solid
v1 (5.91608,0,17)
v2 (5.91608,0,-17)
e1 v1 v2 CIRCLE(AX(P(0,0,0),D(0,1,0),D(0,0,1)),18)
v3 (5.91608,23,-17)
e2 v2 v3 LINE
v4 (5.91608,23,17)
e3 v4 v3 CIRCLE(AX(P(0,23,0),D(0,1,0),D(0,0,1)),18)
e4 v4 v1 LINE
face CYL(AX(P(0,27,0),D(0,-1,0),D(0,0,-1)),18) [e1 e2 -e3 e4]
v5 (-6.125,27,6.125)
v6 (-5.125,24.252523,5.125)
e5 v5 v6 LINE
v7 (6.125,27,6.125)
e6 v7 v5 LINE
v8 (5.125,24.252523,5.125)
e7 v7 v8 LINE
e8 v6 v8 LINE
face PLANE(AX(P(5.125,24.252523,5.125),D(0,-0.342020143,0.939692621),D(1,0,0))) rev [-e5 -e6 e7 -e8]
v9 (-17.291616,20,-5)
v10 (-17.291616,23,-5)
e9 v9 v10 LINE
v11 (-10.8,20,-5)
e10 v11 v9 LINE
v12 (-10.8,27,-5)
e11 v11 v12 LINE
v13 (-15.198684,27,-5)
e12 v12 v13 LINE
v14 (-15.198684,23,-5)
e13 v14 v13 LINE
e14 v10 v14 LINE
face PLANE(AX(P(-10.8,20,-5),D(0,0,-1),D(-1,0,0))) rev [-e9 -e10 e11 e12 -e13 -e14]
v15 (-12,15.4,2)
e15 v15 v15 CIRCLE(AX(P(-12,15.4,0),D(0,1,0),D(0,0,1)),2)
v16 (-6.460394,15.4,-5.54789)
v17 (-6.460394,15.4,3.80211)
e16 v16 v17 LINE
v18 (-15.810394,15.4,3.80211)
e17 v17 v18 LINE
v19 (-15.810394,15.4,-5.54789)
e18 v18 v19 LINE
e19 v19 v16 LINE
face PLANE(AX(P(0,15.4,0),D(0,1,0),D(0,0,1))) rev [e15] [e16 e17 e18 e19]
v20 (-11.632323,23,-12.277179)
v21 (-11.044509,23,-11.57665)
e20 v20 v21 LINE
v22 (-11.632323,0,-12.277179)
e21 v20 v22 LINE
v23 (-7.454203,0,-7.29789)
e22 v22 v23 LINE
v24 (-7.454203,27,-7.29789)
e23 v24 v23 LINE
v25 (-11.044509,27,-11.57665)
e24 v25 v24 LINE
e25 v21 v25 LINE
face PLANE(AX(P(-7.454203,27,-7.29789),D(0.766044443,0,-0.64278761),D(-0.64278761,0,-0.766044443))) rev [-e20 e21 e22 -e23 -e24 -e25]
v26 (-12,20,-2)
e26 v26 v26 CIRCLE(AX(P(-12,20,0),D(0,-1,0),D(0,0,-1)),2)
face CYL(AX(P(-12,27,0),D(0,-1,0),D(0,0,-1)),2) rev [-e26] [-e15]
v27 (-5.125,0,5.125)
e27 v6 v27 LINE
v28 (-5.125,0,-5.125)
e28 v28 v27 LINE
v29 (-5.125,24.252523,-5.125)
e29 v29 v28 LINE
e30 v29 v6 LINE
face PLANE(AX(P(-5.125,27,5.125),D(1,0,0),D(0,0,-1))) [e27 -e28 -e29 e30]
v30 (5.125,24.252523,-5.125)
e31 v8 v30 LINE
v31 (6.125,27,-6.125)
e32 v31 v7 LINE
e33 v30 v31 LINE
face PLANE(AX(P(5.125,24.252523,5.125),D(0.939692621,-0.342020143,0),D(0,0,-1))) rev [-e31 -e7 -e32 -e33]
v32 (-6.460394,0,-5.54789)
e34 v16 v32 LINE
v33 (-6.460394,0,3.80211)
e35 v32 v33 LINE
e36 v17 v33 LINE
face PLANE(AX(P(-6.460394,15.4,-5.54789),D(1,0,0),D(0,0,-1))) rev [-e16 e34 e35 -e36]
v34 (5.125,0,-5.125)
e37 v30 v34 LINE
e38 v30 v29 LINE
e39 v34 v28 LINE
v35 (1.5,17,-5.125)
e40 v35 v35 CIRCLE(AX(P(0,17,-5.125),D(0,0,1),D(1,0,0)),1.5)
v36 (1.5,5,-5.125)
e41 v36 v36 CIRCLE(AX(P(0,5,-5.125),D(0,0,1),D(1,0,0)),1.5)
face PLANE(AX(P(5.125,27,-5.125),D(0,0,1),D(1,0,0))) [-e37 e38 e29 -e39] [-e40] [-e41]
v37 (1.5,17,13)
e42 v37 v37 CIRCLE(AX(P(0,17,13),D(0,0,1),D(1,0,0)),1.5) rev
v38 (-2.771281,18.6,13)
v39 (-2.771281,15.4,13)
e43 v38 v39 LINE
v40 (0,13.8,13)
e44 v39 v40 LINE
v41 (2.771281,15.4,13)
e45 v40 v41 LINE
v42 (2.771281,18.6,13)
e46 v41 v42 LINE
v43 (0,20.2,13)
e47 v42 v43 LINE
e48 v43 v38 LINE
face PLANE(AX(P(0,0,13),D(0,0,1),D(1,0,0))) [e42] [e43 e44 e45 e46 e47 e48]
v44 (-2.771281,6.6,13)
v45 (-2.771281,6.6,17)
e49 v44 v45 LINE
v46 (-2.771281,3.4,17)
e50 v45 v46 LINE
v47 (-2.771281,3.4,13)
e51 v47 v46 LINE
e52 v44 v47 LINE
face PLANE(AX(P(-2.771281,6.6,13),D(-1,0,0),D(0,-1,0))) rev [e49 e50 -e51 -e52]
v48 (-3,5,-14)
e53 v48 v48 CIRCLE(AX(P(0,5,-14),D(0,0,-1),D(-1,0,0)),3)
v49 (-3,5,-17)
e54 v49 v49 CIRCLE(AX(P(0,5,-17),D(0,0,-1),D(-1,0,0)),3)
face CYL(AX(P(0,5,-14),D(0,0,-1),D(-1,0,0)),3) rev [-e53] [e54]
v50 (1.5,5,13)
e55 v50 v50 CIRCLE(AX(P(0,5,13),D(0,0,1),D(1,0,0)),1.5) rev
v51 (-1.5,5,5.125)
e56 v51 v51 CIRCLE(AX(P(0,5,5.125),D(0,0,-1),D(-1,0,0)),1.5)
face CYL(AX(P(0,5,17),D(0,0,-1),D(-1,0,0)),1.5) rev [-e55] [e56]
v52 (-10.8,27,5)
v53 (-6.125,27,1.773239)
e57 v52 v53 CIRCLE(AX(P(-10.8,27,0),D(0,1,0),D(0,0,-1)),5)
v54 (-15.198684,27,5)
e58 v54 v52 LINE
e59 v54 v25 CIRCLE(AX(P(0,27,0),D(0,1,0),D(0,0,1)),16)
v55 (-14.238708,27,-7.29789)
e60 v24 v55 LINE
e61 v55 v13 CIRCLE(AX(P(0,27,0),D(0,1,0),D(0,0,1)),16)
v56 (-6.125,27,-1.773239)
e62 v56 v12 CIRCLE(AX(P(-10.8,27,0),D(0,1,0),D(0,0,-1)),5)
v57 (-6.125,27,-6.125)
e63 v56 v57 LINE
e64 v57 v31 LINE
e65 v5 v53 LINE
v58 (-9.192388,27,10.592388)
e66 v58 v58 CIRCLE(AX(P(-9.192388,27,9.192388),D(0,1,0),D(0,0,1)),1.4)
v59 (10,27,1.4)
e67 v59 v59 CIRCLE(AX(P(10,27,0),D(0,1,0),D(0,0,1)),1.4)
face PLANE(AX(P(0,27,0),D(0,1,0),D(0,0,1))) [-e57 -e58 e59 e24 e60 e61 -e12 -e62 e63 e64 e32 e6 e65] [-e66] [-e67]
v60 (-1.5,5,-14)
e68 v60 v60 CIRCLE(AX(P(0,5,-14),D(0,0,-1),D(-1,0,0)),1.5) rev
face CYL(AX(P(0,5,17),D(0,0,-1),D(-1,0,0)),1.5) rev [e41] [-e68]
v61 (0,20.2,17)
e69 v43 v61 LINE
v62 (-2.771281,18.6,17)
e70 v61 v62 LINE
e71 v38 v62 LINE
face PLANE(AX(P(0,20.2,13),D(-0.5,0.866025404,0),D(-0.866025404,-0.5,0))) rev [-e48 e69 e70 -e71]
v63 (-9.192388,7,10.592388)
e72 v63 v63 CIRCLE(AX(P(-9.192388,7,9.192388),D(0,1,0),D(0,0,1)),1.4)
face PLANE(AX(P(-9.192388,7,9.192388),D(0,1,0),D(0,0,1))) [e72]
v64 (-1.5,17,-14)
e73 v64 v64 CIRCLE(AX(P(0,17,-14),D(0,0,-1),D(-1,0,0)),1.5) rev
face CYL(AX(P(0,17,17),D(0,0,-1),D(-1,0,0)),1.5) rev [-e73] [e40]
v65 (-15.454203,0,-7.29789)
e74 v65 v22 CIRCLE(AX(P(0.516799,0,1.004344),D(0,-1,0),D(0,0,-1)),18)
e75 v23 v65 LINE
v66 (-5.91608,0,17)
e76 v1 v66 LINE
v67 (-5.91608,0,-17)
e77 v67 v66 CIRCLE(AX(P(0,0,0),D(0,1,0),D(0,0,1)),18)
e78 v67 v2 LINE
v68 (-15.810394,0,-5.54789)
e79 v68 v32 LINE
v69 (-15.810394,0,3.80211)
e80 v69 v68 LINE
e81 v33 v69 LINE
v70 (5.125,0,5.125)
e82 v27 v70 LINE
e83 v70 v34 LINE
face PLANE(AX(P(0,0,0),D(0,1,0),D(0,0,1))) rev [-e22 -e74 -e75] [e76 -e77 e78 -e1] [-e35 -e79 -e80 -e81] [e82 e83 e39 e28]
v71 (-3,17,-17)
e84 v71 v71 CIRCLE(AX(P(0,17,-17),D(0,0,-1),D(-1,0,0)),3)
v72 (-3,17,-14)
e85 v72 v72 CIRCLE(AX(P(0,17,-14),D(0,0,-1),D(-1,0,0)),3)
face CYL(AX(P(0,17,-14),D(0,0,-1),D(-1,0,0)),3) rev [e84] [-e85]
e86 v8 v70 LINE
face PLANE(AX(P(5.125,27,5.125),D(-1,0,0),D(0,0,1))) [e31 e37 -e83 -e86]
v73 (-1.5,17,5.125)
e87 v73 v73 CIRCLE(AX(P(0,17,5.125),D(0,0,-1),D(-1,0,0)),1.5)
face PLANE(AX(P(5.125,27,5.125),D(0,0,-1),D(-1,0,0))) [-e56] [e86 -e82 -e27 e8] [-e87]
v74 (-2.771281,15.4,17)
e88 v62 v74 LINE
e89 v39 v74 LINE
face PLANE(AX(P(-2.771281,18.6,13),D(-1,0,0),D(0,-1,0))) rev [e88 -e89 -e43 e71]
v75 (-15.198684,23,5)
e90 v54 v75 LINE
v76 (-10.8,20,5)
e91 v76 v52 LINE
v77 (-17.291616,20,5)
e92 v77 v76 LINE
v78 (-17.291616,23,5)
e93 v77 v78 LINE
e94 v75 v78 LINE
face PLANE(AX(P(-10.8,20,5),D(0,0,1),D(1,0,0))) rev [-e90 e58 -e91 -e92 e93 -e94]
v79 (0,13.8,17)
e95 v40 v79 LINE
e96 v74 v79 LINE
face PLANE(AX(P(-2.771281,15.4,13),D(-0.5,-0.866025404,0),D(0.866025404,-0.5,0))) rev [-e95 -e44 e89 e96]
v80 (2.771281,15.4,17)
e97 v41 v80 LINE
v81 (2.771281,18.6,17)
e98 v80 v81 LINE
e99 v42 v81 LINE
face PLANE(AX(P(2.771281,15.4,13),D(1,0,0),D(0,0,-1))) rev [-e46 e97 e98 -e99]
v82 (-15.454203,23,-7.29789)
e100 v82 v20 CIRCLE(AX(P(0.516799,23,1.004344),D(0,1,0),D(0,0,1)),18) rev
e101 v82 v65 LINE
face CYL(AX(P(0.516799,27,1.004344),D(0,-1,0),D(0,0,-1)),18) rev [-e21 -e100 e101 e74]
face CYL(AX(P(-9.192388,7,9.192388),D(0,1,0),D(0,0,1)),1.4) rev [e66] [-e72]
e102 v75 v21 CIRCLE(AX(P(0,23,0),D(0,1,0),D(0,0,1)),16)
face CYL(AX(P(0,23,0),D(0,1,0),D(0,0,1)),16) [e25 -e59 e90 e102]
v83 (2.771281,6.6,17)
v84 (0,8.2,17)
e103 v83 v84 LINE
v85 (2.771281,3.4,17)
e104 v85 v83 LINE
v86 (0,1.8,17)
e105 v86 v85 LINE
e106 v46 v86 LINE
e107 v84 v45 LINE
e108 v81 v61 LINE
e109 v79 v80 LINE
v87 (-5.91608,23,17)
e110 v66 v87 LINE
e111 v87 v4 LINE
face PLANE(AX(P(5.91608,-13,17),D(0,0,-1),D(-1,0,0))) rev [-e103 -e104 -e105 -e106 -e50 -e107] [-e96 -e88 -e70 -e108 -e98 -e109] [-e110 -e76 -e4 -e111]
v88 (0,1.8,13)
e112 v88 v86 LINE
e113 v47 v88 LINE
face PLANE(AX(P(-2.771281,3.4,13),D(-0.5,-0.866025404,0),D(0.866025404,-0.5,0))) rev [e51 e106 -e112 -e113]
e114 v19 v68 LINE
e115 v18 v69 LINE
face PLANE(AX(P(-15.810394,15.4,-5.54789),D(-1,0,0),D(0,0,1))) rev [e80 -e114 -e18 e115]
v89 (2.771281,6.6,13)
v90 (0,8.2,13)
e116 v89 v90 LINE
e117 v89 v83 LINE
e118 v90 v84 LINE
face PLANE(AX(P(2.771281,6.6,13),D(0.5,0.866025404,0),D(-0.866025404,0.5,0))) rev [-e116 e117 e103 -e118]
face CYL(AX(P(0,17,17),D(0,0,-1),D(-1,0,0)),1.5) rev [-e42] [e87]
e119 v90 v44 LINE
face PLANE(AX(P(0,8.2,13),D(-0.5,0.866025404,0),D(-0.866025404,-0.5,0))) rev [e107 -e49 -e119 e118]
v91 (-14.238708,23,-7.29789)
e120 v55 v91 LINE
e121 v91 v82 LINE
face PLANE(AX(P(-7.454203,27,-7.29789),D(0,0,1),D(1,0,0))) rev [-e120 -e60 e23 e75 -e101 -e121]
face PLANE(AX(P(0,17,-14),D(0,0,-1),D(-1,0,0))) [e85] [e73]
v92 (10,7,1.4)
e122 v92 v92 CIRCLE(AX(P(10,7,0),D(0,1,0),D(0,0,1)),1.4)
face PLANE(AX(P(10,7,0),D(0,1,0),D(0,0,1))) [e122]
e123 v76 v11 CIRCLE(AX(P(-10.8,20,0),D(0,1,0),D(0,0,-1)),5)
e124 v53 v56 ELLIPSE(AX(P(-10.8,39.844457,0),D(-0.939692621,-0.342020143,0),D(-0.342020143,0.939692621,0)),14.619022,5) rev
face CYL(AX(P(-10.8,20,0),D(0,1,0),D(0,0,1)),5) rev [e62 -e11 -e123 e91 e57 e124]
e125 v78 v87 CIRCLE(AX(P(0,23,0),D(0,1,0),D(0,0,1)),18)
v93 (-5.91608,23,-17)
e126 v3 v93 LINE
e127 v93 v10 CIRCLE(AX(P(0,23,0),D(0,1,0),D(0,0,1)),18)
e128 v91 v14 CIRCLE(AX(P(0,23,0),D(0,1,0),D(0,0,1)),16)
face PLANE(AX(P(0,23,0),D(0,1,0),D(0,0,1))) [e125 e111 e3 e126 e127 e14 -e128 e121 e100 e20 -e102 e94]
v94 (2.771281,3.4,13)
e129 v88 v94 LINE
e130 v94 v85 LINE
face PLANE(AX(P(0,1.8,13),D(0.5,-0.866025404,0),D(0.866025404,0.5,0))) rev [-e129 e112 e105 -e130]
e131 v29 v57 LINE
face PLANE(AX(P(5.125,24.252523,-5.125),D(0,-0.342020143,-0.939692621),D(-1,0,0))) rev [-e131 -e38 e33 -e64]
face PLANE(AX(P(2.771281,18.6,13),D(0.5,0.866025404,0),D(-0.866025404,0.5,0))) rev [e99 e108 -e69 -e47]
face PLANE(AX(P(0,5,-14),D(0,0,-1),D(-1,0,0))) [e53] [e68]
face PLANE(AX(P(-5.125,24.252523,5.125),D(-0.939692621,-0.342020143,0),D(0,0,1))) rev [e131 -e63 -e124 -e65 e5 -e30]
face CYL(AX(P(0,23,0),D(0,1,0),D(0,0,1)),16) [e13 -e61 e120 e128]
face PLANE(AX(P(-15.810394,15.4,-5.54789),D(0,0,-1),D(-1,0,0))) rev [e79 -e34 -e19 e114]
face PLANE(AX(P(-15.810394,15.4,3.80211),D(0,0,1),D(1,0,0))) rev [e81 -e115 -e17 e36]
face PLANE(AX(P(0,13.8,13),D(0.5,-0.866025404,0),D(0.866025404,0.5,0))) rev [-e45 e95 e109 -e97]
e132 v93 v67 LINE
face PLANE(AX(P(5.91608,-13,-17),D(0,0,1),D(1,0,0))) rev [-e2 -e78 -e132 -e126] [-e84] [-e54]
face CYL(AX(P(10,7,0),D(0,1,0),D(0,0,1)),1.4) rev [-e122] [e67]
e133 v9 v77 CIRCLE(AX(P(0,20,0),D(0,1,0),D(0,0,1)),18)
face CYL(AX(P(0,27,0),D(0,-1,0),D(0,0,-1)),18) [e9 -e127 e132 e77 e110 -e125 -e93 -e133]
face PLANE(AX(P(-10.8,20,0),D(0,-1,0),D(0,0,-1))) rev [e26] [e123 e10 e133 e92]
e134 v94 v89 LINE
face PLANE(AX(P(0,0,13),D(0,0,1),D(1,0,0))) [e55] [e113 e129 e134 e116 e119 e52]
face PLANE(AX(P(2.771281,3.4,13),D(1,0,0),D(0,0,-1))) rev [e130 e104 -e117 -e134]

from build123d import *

# Parameters (mm, degrees)
SKETCH1_R           = 18
SKETCH1_R_2         = 2
SKETCH1_W           = 10.25
SKETCH1_H           = 10.25
BOSS_EXTRUDE1_DEPTH = 27
CUT_EXTRUDE1_START  = -7
CUT_EXTRUDE1_DEPTH  = 7
SKETCH4_W           = 9.35
SKETCH4_H           = 9.35
CUT_EXTRUDE3_DEPTH  = 15.4
CUT_EXTRUDE4_START  = -40
CUT_EXTRUDE4_DEPTH  = 40
SKETCH6_R           = 1.5
CUT_EXTRUDE5_DEPTH  = 48
SKETCH7_R           = 3
CUT_EXTRUDE6_DEPTH  = 3
CUT_EXTRUDE7_DEPTH  = 4
CHAMFER1_SIZE       = 1
CHAMFER1_SIZE_2     = 2.747477419
CUT_EXTRUDE8_DEPTH  = 37.633318168
SKETCH12_R          = 1.4
CUT_EXTRUDE10_DEPTH = 20
CUT_EXTRUDE9_START  = -4
SKETCH10_R          = 18
SKETCH10_R_2        = 16
CUT_EXTRUDE9_DEPTH  = 4


with BuildPart() as part:
    # Sketch1 → Boss-Extrude1 (new body)
    with BuildSketch(Plane(origin=(0, 0, 0), x_dir=(1, 0, 0), z_dir=(0, 1, 0))):
        with Locations(Location((0, 0, 0), (0, 0, 270))):
            Circle(SKETCH1_R)
        with Locations(Location((-12, 0, 0), (0, 0, 270))):
            Circle(SKETCH1_R_2, mode=Mode.SUBTRACT)
        Rectangle(SKETCH1_W, SKETCH1_H, mode=Mode.SUBTRACT)
    extrude(amount=BOSS_EXTRUDE1_DEPTH)

    # Sketch2 → Cut-Extrude1 (cut)
    with BuildSketch(Plane(origin=(0, 27, 0), x_dir=(1, 0, 0), z_dir=(0, 1, 0)).offset(CUT_EXTRUDE1_START)):
        with BuildLine():
            Line((-10.8, 5), (-17.291616466, 5))
            ThreePointArc((-17.291616466, 5), (-18, 0), (-17.291616466, -5))
            Line((-17.291616466, -5), (-10.8, -5))
            ThreePointArc((-10.8, -5), (-5.8, 0), (-10.8, 5))
        make_face()
    extrude(amount=CUT_EXTRUDE1_DEPTH, mode=Mode.SUBTRACT)

    # Sketch4 → Cut-Extrude3 (cut)
    with BuildSketch(Plane(origin=(0, 0, 0), x_dir=(-1, 0, 0), z_dir=(0, -1, 0))):
        with Locations((11.135393506, 0.872889968)):
            Rectangle(SKETCH4_W, SKETCH4_H)
    extrude(amount=-CUT_EXTRUDE3_DEPTH, mode=Mode.SUBTRACT)

    # Sketch5 → Cut-Extrude4 (cut)
    with BuildSketch(Plane(origin=(0, 27, 0), x_dir=(1, 0, 0), z_dir=(0, 1, 0)).offset(CUT_EXTRUDE4_START)):
        with BuildLine():
            Line((5.916079783, 17), (-5.916079783, 17))
            ThreePointArc((-5.916079783, 17), (0, 18), (5.916079783, 17))
        make_face()
        with BuildLine():
            Line((5.916079783, -17), (-5.916079783, -17))
            ThreePointArc((-5.916079783, -17), (0, -18), (5.916079783, -17))
        make_face()
    extrude(amount=CUT_EXTRUDE4_DEPTH, mode=Mode.SUBTRACT)

    # Sketch6 → Cut-Extrude5 (cut, through all)
    with BuildSketch(Plane(origin=(0, 0, -17), x_dir=(-1, 0, 0), z_dir=(0, 0, -1))):
        with Locations((0, 17)):
            Circle(SKETCH6_R)
        with Locations((0, 5)):
            Circle(SKETCH6_R)
    extrude(amount=-CUT_EXTRUDE5_DEPTH, mode=Mode.SUBTRACT)

    # Sketch7 → Cut-Extrude6 (cut)
    with BuildSketch(Plane(origin=(0, 0, -17), x_dir=(-1, 0, 0), z_dir=(0, 0, -1))):
        with Locations((0, 17)):
            Circle(SKETCH7_R)
        with Locations((0, 5)):
            Circle(SKETCH7_R)
    extrude(amount=-CUT_EXTRUDE6_DEPTH, mode=Mode.SUBTRACT)

    # Sketch8 → Cut-Extrude7 (cut)
    with BuildSketch(Plane.XY.offset(17)):
        Polygon((0, 13.8), (2.771281292, 15.4), (2.771281292, 18.6), (0, 20.2), (-2.771281292, 18.6), (-2.771281292, 15.4), align=None)
        Polygon((0, 1.8), (2.771281292, 3.4), (2.771281292, 6.6), (0, 8.2), (-2.771281292, 6.6), (-2.771281292, 3.4), align=None)
    extrude(amount=-CUT_EXTRUDE7_DEPTH, mode=Mode.SUBTRACT)

    # Chamfer1
    # the kernel refuses this chamfer: 2.747477419, 1 mm, written as the material it takes off along each edge
    with BuildSketch(Plane(origin=(-5.125, 27, -5.125), x_dir=(0, 0.09904090225204956, -0.9950833631817488), z_dir=(1, 0, 0)), Plane(origin=(-5.125, 27, 5.125), x_dir=(-0.9950833631817488, 0.09904090225204956, 0), z_dir=(0, 0, -1)), Plane(origin=(5.125, 27, 5.125), x_dir=(0, 0.09904090225204956, 0.9950833631817488), z_dir=(-1, 0, 0)), Plane(origin=(5.125, 27, -5.125), x_dir=(0.9950833631817488, 0.09904090225204956, 0), z_dir=(0, 0, 1))) as chamfer1_piece_1:
        Polygon((CHAMFER1_SIZE * 0.995083363182, -CHAMFER1_SIZE * 0.099040902252), (-CHAMFER1_SIZE_2 * 0.0990409022684, -CHAMFER1_SIZE_2 * 0.995083363346), (0, 0), align=None)
    extrude(amount=10.25, mode=Mode.SUBTRACT)
    with BuildSketch(Plane(origin=(-5.125, 27, 5.125), x_dir=(-0.9950833631817488, 0.09904090225204956, 0), z_dir=(0, 0, -1))) as chamfer1_piece_2a_section:
        Polygon((CHAMFER1_SIZE * 0.995083363182, -CHAMFER1_SIZE * 0.099040902252), (-CHAMFER1_SIZE_2 * 0.0990409022684, -CHAMFER1_SIZE_2 * 0.995083363346), (0, 0), align=None)
    chamfer1_piece_2a = extrude(amount=17.377491449, mode=Mode.PRIVATE)
    chamfer1_piece_2a = split(chamfer1_piece_2a, bisect_by=Plane(origin=(-5.432505006, 26.059901151, -5.125), z_dir=(0, 0, -1)), keep=Keep.TOP, mode=Mode.PRIVATE)
    with BuildSketch(Plane(origin=(-12.252491449, 27, -5.125), x_dir=(0, 0.09904090225204956, -0.9950833631817488), z_dir=(1, 0, 0))) as chamfer1_piece_2b_section:
        Polygon((CHAMFER1_SIZE * 0.995083363182, -CHAMFER1_SIZE * 0.099040902252), (-CHAMFER1_SIZE_2 * 0.0990409022684, -CHAMFER1_SIZE_2 * 0.995083363346), (0, 0), align=None)
    chamfer1_piece_2b = extrude(amount=17.377491449, mode=Mode.PRIVATE)
    chamfer1_piece_2b = split(chamfer1_piece_2b, bisect_by=Plane(origin=(-5.125, 26.059901151, -5.432505006), z_dir=(-1, 0, 0)), keep=Keep.TOP, mode=Mode.PRIVATE)
    chamfer1_piece_2 = chamfer1_piece_2a & chamfer1_piece_2b
    add(chamfer1_piece_2, mode=Mode.SUBTRACT)
    with BuildSketch(Plane(origin=(5.125, 27, -12.252491449), x_dir=(0.9950833631817488, 0.09904090225204956, 0), z_dir=(0, 0, 1))) as chamfer1_piece_3a_section:
        Polygon((CHAMFER1_SIZE * 0.995083363182, -CHAMFER1_SIZE * 0.099040902252), (-CHAMFER1_SIZE_2 * 0.0990409022684, -CHAMFER1_SIZE_2 * 0.995083363346), (0, 0), align=None)
    chamfer1_piece_3a = extrude(amount=17.377491449, mode=Mode.PRIVATE)
    chamfer1_piece_3a = split(chamfer1_piece_3a, bisect_by=Plane(origin=(5.432505006, 26.059901151, -5.125), z_dir=(0, 0, -1)), keep=Keep.TOP, mode=Mode.PRIVATE)
    with BuildSketch(Plane(origin=(-5.125, 27, -5.125), x_dir=(0, 0.09904090225204956, -0.9950833631817488), z_dir=(1, 0, 0))) as chamfer1_piece_3b_section:
        Polygon((CHAMFER1_SIZE * 0.995083363182, -CHAMFER1_SIZE * 0.099040902252), (-CHAMFER1_SIZE_2 * 0.0990409022684, -CHAMFER1_SIZE_2 * 0.995083363346), (0, 0), align=None)
    chamfer1_piece_3b = extrude(amount=17.377491449, mode=Mode.PRIVATE)
    chamfer1_piece_3b = split(chamfer1_piece_3b, bisect_by=Plane(origin=(5.125, 26.059901151, -5.432505006), z_dir=(1, 0, 0)), keep=Keep.TOP, mode=Mode.PRIVATE)
    chamfer1_piece_3 = chamfer1_piece_3a & chamfer1_piece_3b
    add(chamfer1_piece_3, mode=Mode.SUBTRACT)
    with BuildSketch(Plane(origin=(5.125, 27, 5.125), x_dir=(0, 0.09904090225204956, 0.9950833631817488), z_dir=(-1, 0, 0))) as chamfer1_piece_4a_section:
        Polygon((CHAMFER1_SIZE * 0.995083363182, -CHAMFER1_SIZE * 0.099040902252), (-CHAMFER1_SIZE_2 * 0.0990409022684, -CHAMFER1_SIZE_2 * 0.995083363346), (0, 0), align=None)
    chamfer1_piece_4a = extrude(amount=17.377491449, mode=Mode.PRIVATE)
    chamfer1_piece_4a = split(chamfer1_piece_4a, bisect_by=Plane(origin=(-5.125, 26.059901151, 5.432505006), z_dir=(-1, 0, 0)), keep=Keep.TOP, mode=Mode.PRIVATE)
    with BuildSketch(Plane(origin=(-5.125, 27, 12.252491449), x_dir=(-0.9950833631817488, 0.09904090225204956, 0), z_dir=(0, 0, -1))) as chamfer1_piece_4b_section:
        Polygon((CHAMFER1_SIZE * 0.995083363182, -CHAMFER1_SIZE * 0.099040902252), (-CHAMFER1_SIZE_2 * 0.0990409022684, -CHAMFER1_SIZE_2 * 0.995083363346), (0, 0), align=None)
    chamfer1_piece_4b = extrude(amount=17.377491449, mode=Mode.PRIVATE)
    chamfer1_piece_4b = split(chamfer1_piece_4b, bisect_by=Plane(origin=(-5.432505006, 26.059901151, 5.125), z_dir=(0, 0, 1)), keep=Keep.TOP, mode=Mode.PRIVATE)
    chamfer1_piece_4 = chamfer1_piece_4a & chamfer1_piece_4b
    add(chamfer1_piece_4, mode=Mode.SUBTRACT)
    with BuildSketch(Plane(origin=(12.252491449, 27, 5.125), x_dir=(0, 0.09904090225204956, 0.9950833631817488), z_dir=(-1, 0, 0))) as chamfer1_piece_5a_section:
        Polygon((CHAMFER1_SIZE * 0.995083363182, -CHAMFER1_SIZE * 0.099040902252), (-CHAMFER1_SIZE_2 * 0.0990409022684, -CHAMFER1_SIZE_2 * 0.995083363346), (0, 0), align=None)
    chamfer1_piece_5a = extrude(amount=17.377491449, mode=Mode.PRIVATE)
    chamfer1_piece_5a = split(chamfer1_piece_5a, bisect_by=Plane(origin=(5.125, 26.059901151, 5.432505006), z_dir=(1, 0, 0)), keep=Keep.TOP, mode=Mode.PRIVATE)
    with BuildSketch(Plane(origin=(5.125, 27, -5.125), x_dir=(0.9950833631817488, 0.09904090225204956, 0), z_dir=(0, 0, 1))) as chamfer1_piece_5b_section:
        Polygon((CHAMFER1_SIZE * 0.995083363182, -CHAMFER1_SIZE * 0.099040902252), (-CHAMFER1_SIZE_2 * 0.0990409022684, -CHAMFER1_SIZE_2 * 0.995083363346), (0, 0), align=None)
    chamfer1_piece_5b = extrude(amount=17.377491449, mode=Mode.PRIVATE)
    chamfer1_piece_5b = split(chamfer1_piece_5b, bisect_by=Plane(origin=(5.432505006, 26.059901151, 5.125), z_dir=(0, 0, 1)), keep=Keep.TOP, mode=Mode.PRIVATE)
    chamfer1_piece_5 = chamfer1_piece_5a & chamfer1_piece_5b
    add(chamfer1_piece_5, mode=Mode.SUBTRACT)

    # Sketch9 → Cut-Extrude8 (cut, through all)
    with BuildSketch(Plane.XZ):
        with BuildLine():
            Line((-7.454203172, -7.297889968), (-15.454203172, -7.297889968))
            ThreePointArc((-15.454203172, -7.297889968), (-13.761984914, -9.955415688), (-11.632322635, -12.277178848))
            Line((-11.632322635, -12.277178848), (-7.454203172, -7.297889968))
        make_face()
    extrude(amount=-CUT_EXTRUDE8_DEPTH, mode=Mode.SUBTRACT)

    # Sketch12 → Cut-Extrude10 (cut)
    with BuildSketch(Plane(origin=(0, 27, 0), x_dir=(1, 0, 0), z_dir=(0, 1, 0))):
        with Locations(Location((10, 0, 0), (0, 0, 270))):
            Circle(SKETCH12_R)
        with Locations(Location((-9.192388155, -9.192388155, 0), (0, 0, 270))):
            Circle(SKETCH12_R)
    extrude(amount=-CUT_EXTRUDE10_DEPTH, mode=Mode.SUBTRACT)

    # Sketch10 → Cut-Extrude9 (cut)
    with BuildSketch(Plane(origin=(0, 27, 0), x_dir=(1, 0, 0), z_dir=(0, 1, 0)).offset(CUT_EXTRUDE9_START)):
        Circle(SKETCH10_R)
        Circle(SKETCH10_R_2, mode=Mode.SUBTRACT)
    extrude(amount=CUT_EXTRUDE9_DEPTH, mode=Mode.SUBTRACT)


solid = part.part
